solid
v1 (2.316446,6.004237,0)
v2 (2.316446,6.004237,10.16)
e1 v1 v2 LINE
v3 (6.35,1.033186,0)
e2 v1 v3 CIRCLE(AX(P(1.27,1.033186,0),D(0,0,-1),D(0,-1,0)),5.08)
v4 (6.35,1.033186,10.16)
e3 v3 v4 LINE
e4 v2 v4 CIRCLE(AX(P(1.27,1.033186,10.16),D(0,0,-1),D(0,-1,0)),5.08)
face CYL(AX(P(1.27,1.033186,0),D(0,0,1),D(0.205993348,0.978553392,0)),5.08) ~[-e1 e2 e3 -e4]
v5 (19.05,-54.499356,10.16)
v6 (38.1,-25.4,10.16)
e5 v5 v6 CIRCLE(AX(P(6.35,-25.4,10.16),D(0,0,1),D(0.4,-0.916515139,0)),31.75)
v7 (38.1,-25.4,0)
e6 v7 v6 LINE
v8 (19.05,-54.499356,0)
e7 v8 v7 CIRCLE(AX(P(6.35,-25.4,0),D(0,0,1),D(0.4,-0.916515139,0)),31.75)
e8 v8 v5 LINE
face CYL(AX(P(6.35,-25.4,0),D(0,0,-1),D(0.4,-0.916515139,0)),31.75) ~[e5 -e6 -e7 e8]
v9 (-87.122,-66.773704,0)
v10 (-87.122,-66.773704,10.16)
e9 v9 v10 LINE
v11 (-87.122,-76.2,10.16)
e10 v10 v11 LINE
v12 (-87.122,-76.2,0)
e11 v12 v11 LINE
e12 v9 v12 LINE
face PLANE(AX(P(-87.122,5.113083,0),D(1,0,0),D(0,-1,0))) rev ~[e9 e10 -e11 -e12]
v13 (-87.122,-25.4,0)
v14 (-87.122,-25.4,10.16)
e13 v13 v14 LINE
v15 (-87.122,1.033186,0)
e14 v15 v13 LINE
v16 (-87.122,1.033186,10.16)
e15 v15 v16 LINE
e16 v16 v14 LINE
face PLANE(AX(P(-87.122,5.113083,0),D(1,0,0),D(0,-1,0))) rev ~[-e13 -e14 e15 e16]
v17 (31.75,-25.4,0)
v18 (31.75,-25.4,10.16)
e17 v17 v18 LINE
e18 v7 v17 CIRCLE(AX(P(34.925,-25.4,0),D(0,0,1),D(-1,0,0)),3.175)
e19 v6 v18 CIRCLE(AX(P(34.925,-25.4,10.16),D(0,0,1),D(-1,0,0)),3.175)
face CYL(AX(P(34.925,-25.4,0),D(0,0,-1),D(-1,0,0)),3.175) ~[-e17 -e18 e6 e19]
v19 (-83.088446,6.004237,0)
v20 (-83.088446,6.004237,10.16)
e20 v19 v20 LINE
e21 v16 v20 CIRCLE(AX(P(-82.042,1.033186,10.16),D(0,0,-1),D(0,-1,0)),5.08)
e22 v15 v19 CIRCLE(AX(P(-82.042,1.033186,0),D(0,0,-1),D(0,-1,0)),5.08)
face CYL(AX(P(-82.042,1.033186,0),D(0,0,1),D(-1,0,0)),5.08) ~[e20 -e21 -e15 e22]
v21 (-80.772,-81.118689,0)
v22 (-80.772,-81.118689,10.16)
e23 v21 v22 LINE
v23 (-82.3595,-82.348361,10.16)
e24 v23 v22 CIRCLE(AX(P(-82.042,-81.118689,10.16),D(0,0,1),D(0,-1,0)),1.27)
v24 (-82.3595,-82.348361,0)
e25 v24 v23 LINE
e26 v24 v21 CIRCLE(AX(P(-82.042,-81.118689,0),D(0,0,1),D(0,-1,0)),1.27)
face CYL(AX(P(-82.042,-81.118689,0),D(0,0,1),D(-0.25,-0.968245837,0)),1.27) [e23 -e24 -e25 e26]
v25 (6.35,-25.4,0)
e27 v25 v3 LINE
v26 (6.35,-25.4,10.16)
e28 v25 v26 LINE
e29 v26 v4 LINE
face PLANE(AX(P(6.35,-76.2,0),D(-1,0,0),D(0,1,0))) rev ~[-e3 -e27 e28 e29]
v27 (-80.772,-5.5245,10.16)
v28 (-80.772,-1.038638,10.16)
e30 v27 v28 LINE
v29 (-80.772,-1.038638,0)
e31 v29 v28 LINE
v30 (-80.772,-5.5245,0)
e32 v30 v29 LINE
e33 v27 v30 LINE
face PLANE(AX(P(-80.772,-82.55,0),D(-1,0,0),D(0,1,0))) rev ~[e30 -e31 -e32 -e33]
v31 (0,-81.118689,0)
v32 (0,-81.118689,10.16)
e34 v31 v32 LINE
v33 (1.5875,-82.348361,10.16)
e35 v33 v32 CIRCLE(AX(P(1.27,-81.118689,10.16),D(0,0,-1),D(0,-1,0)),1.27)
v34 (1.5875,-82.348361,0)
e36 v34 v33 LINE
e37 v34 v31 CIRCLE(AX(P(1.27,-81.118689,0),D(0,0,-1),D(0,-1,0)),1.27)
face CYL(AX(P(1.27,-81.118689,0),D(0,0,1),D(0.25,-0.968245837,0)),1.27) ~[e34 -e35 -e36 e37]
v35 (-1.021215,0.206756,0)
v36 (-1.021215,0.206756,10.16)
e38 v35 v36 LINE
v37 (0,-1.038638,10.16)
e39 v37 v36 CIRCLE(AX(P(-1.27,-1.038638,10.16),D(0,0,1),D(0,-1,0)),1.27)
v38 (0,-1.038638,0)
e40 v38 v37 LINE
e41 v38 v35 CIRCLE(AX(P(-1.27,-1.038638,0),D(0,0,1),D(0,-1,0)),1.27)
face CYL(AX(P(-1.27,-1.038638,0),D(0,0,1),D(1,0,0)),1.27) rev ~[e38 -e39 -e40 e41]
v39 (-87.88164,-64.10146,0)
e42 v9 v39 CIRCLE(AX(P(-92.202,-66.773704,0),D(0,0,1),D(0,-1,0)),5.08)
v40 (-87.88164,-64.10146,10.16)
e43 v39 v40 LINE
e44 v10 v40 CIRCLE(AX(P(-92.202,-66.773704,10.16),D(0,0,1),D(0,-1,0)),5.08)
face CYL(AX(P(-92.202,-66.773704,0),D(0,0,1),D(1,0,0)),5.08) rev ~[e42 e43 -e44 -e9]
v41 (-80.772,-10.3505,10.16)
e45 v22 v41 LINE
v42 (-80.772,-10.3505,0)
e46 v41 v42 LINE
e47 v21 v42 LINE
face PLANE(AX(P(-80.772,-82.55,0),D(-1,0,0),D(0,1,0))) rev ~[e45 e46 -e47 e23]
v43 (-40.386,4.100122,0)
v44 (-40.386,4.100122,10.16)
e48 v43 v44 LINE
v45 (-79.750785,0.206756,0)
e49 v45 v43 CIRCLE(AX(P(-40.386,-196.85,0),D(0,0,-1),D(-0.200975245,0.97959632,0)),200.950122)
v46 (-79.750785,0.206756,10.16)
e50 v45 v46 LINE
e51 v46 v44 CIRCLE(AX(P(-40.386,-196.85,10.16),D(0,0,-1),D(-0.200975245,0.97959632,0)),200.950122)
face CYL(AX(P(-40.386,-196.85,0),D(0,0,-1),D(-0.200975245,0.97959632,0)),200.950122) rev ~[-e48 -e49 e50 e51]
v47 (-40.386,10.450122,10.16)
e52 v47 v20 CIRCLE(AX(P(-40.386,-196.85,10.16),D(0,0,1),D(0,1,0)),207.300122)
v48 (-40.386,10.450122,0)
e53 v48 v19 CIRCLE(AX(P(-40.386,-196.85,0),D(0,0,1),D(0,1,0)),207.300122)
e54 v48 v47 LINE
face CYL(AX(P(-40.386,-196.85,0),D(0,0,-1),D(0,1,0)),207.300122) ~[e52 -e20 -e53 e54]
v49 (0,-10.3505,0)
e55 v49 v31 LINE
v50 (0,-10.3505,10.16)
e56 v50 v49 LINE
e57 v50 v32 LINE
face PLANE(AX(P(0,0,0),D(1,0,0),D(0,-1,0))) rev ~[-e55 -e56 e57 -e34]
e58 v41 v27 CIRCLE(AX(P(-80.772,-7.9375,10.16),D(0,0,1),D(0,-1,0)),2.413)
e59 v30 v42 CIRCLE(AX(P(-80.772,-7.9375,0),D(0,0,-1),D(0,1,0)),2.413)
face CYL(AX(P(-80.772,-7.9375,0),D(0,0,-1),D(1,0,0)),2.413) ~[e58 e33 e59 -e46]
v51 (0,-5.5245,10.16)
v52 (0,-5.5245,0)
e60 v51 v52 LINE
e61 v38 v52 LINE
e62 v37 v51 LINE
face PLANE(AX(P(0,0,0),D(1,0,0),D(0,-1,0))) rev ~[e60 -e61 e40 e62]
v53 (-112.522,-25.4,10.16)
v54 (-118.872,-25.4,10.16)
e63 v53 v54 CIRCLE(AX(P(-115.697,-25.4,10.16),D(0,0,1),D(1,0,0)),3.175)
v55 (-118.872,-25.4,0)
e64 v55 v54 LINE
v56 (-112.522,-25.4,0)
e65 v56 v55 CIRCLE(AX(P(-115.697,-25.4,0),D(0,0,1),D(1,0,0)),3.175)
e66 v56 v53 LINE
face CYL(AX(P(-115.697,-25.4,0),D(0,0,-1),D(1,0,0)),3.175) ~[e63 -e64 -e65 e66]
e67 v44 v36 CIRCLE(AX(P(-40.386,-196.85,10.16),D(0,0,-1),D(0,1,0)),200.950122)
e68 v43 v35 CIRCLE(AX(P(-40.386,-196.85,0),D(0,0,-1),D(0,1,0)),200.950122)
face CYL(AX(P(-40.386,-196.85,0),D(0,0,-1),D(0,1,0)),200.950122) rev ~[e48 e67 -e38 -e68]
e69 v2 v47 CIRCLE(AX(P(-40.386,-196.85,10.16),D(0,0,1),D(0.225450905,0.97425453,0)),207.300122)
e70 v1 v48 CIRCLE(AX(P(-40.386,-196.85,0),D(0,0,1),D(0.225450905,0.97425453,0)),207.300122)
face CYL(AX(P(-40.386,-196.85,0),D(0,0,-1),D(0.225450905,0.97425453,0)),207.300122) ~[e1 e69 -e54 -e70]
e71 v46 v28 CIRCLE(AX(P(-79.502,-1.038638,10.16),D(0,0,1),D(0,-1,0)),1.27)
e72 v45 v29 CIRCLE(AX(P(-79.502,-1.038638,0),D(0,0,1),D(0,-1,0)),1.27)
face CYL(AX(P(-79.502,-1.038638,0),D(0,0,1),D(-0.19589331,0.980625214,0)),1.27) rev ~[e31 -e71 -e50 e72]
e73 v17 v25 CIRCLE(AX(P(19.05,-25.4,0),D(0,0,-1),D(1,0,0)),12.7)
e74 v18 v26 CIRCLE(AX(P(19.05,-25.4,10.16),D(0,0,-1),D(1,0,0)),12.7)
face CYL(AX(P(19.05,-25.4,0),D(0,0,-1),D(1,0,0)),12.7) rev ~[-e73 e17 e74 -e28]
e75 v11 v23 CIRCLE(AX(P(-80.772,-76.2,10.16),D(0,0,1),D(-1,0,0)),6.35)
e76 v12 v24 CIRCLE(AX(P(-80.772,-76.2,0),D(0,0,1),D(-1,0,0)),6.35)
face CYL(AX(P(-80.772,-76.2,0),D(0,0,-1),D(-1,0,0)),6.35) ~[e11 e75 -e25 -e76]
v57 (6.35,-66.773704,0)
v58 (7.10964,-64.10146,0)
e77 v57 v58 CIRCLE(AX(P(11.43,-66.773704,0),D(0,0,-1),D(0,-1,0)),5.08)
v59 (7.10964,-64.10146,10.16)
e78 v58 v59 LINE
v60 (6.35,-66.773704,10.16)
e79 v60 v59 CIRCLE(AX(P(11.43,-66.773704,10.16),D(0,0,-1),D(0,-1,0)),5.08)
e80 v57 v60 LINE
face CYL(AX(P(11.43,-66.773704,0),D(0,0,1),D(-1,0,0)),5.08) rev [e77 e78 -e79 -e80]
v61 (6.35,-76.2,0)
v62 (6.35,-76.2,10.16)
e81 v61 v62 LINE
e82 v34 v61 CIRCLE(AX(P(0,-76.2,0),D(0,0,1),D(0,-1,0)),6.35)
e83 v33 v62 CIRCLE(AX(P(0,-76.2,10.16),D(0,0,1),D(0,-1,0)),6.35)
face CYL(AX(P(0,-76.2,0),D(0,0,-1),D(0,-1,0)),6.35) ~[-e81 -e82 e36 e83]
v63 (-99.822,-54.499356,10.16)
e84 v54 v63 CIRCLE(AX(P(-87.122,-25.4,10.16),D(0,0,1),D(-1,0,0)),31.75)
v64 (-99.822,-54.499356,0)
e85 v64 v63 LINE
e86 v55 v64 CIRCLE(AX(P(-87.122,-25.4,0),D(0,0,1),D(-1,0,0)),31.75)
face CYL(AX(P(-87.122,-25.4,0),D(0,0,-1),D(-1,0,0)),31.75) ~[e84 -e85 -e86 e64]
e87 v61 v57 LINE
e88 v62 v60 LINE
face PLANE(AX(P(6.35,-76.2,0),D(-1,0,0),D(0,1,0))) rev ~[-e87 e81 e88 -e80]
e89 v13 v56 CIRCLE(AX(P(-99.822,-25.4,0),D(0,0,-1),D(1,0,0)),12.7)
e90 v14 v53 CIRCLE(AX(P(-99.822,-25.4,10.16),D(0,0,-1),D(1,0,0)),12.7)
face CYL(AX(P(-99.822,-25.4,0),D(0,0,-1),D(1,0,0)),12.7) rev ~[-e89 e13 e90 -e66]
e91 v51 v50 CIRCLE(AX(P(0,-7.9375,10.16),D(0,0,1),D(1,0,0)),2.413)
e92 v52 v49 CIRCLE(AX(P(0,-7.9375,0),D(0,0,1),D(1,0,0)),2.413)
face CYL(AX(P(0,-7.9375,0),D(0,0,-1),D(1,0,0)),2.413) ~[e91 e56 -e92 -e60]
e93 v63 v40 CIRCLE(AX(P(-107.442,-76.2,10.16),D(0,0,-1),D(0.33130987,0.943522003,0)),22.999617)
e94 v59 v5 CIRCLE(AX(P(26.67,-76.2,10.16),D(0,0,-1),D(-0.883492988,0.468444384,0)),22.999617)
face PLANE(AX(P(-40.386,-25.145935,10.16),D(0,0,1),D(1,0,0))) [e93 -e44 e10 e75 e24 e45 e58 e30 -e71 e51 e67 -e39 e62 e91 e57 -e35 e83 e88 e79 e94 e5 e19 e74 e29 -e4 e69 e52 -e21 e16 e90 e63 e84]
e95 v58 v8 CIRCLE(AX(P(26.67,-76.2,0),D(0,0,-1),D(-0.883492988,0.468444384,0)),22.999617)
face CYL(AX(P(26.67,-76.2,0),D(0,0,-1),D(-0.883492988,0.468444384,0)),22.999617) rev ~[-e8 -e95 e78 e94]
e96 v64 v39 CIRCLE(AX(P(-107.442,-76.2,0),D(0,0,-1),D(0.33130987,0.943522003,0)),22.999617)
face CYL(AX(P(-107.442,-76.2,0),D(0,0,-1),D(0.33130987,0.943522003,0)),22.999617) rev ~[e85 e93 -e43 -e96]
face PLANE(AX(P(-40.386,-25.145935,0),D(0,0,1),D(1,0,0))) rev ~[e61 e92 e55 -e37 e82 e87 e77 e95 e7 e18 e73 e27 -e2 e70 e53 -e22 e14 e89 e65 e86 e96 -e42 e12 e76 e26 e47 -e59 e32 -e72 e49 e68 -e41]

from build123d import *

# Parameters (mm, degrees)
F2_DEPTH = 10.16
F3_R     = 2.413
F4_DEPTH = 10.16
F5_R     = 5.08
F6_R     = 1.27
F8_DEPTH = 10.16
F9_R     = 5.08


# Not quite as in the source:
# - a variable given as a bare number and used for a length is read in inches; the dataset says mm whatever the document's units were
# - a feature names something its author has since deleted; it is built from what else it names


with BuildPart() as f2:
    # F1 (on Top) → F2 (new body)
    with BuildSketch(Plane.XY):
        with BuildLine():
            Line((0, 0), (0, -76.2))
            Line((0, -76.2), (0, -82.55))
            ThreePointArc((0, -82.55), (4.4901280605, -80.6901280605), (6.35, -76.2))
            Line((6.35, -76.2), (6.35, 5.1130828846))
            ThreePointArc((6.35, 5.1130828846), (-16.8661271179, 9.1115403998), (-40.386, 10.4501219109))
            ThreePointArc((-40.386, 10.4501219109), (-63.9058728821, 9.1115403998), (-87.122, 5.1130828846))
            Line((-87.122, 5.1130828846), (-87.122, -76.2))
            ThreePointArc((-87.122, -76.2), (-85.2621280605, -80.6901280605), (-80.772, -82.55))
            Line((-80.772, -82.55), (-80.772, -76.2))
            Line((-80.772, -76.2), (-80.772, 0))
            ThreePointArc((-80.772, 0), (-60.6827977504, 3.072463713), (-40.386, 4.1001219109))
            ThreePointArc((-40.386, 4.1001219109), (-20.0892022496, 3.072463713), (0, 0))
        make_face()
    extrude(amount=F2_DEPTH)

    # F3 (on Top) → F4 (join)
    with BuildSketch(Plane.XY):
        with Locations((0, -7.9375)):
            Circle(F3_R)
        with Locations((-80.772, -7.9375)):
            Circle(F3_R)
    extrude(amount=F4_DEPTH)

    # F5
    f5_edges = [f2.edges().sort_by_distance(p)[0] for p in [
        (-87.122, 5.113083, 5.08),
        (6.35, 5.113083, 5.08),
    ]]
    fillet(f5_edges, radius=F5_R)

    # F6
    f6_edges = [f2.edges().sort_by_distance(p)[0] for p in [
        (0, -82.55, 5.08),
        (-80.772, -82.55, 5.08),
        (0, 0, 5.08),
        (-80.772, 0, 5.08),
    ]]
    fillet(f6_edges, radius=F6_R)

    # F7 (on Top) → F8 (join)
    with BuildSketch(Plane.XY):
        with BuildLine():
            ThreePointArc((31.75, -25.4), (19.05, -38.1), (6.35, -25.4))
            Line((6.35, -25.4), (6.35, -65.42595876))
            ThreePointArc((6.35, -65.42595876), (11.6697145424, -58.7651555547), (19.05, -54.499355663))
            ThreePointArc((19.05, -54.499355663), (32.9139558425, -42.7901912008), (38.1, -25.4))
            ThreePointArc((38.1, -25.4), (34.925, -28.575), (31.75, -25.4))
        make_face()
        with BuildLine():
            ThreePointArc((38.1, -25.4), (34.925, -22.225), (31.75, -25.4))
            ThreePointArc((31.75, -25.4), (34.925, -28.575), (38.1, -25.4))
        make_face()
        with BuildLine():
            Line((-87.122, -65.42595876), (-87.122, -25.4))
            ThreePointArc((-87.122, -25.4), (-99.822, -38.1), (-112.522, -25.4))
            ThreePointArc((-112.522, -25.4), (-115.697, -28.575), (-118.872, -25.4))
            ThreePointArc((-118.872, -25.4), (-113.6859558425, -42.7901912008), (-99.822, -54.499355663))
            ThreePointArc((-99.822, -54.499355663), (-92.4417145424, -58.7651555547), (-87.122, -65.42595876))
        make_face()
        with BuildLine():
            ThreePointArc((-118.872, -25.4), (-115.697, -28.575), (-112.522, -25.4))
            ThreePointArc((-112.522, -25.4), (-115.697, -22.225), (-118.872, -25.4))
        make_face()
    extrude(amount=F8_DEPTH)

    # F9
    f9_edges = [f2.edges().sort_by_distance(p)[0] for p in [
        (6.35, -65.425959, 5.08),
        (-87.122, -65.425959, 5.08),
    ]]
    fillet(f9_edges, radius=F9_R)


solid = f2.part
